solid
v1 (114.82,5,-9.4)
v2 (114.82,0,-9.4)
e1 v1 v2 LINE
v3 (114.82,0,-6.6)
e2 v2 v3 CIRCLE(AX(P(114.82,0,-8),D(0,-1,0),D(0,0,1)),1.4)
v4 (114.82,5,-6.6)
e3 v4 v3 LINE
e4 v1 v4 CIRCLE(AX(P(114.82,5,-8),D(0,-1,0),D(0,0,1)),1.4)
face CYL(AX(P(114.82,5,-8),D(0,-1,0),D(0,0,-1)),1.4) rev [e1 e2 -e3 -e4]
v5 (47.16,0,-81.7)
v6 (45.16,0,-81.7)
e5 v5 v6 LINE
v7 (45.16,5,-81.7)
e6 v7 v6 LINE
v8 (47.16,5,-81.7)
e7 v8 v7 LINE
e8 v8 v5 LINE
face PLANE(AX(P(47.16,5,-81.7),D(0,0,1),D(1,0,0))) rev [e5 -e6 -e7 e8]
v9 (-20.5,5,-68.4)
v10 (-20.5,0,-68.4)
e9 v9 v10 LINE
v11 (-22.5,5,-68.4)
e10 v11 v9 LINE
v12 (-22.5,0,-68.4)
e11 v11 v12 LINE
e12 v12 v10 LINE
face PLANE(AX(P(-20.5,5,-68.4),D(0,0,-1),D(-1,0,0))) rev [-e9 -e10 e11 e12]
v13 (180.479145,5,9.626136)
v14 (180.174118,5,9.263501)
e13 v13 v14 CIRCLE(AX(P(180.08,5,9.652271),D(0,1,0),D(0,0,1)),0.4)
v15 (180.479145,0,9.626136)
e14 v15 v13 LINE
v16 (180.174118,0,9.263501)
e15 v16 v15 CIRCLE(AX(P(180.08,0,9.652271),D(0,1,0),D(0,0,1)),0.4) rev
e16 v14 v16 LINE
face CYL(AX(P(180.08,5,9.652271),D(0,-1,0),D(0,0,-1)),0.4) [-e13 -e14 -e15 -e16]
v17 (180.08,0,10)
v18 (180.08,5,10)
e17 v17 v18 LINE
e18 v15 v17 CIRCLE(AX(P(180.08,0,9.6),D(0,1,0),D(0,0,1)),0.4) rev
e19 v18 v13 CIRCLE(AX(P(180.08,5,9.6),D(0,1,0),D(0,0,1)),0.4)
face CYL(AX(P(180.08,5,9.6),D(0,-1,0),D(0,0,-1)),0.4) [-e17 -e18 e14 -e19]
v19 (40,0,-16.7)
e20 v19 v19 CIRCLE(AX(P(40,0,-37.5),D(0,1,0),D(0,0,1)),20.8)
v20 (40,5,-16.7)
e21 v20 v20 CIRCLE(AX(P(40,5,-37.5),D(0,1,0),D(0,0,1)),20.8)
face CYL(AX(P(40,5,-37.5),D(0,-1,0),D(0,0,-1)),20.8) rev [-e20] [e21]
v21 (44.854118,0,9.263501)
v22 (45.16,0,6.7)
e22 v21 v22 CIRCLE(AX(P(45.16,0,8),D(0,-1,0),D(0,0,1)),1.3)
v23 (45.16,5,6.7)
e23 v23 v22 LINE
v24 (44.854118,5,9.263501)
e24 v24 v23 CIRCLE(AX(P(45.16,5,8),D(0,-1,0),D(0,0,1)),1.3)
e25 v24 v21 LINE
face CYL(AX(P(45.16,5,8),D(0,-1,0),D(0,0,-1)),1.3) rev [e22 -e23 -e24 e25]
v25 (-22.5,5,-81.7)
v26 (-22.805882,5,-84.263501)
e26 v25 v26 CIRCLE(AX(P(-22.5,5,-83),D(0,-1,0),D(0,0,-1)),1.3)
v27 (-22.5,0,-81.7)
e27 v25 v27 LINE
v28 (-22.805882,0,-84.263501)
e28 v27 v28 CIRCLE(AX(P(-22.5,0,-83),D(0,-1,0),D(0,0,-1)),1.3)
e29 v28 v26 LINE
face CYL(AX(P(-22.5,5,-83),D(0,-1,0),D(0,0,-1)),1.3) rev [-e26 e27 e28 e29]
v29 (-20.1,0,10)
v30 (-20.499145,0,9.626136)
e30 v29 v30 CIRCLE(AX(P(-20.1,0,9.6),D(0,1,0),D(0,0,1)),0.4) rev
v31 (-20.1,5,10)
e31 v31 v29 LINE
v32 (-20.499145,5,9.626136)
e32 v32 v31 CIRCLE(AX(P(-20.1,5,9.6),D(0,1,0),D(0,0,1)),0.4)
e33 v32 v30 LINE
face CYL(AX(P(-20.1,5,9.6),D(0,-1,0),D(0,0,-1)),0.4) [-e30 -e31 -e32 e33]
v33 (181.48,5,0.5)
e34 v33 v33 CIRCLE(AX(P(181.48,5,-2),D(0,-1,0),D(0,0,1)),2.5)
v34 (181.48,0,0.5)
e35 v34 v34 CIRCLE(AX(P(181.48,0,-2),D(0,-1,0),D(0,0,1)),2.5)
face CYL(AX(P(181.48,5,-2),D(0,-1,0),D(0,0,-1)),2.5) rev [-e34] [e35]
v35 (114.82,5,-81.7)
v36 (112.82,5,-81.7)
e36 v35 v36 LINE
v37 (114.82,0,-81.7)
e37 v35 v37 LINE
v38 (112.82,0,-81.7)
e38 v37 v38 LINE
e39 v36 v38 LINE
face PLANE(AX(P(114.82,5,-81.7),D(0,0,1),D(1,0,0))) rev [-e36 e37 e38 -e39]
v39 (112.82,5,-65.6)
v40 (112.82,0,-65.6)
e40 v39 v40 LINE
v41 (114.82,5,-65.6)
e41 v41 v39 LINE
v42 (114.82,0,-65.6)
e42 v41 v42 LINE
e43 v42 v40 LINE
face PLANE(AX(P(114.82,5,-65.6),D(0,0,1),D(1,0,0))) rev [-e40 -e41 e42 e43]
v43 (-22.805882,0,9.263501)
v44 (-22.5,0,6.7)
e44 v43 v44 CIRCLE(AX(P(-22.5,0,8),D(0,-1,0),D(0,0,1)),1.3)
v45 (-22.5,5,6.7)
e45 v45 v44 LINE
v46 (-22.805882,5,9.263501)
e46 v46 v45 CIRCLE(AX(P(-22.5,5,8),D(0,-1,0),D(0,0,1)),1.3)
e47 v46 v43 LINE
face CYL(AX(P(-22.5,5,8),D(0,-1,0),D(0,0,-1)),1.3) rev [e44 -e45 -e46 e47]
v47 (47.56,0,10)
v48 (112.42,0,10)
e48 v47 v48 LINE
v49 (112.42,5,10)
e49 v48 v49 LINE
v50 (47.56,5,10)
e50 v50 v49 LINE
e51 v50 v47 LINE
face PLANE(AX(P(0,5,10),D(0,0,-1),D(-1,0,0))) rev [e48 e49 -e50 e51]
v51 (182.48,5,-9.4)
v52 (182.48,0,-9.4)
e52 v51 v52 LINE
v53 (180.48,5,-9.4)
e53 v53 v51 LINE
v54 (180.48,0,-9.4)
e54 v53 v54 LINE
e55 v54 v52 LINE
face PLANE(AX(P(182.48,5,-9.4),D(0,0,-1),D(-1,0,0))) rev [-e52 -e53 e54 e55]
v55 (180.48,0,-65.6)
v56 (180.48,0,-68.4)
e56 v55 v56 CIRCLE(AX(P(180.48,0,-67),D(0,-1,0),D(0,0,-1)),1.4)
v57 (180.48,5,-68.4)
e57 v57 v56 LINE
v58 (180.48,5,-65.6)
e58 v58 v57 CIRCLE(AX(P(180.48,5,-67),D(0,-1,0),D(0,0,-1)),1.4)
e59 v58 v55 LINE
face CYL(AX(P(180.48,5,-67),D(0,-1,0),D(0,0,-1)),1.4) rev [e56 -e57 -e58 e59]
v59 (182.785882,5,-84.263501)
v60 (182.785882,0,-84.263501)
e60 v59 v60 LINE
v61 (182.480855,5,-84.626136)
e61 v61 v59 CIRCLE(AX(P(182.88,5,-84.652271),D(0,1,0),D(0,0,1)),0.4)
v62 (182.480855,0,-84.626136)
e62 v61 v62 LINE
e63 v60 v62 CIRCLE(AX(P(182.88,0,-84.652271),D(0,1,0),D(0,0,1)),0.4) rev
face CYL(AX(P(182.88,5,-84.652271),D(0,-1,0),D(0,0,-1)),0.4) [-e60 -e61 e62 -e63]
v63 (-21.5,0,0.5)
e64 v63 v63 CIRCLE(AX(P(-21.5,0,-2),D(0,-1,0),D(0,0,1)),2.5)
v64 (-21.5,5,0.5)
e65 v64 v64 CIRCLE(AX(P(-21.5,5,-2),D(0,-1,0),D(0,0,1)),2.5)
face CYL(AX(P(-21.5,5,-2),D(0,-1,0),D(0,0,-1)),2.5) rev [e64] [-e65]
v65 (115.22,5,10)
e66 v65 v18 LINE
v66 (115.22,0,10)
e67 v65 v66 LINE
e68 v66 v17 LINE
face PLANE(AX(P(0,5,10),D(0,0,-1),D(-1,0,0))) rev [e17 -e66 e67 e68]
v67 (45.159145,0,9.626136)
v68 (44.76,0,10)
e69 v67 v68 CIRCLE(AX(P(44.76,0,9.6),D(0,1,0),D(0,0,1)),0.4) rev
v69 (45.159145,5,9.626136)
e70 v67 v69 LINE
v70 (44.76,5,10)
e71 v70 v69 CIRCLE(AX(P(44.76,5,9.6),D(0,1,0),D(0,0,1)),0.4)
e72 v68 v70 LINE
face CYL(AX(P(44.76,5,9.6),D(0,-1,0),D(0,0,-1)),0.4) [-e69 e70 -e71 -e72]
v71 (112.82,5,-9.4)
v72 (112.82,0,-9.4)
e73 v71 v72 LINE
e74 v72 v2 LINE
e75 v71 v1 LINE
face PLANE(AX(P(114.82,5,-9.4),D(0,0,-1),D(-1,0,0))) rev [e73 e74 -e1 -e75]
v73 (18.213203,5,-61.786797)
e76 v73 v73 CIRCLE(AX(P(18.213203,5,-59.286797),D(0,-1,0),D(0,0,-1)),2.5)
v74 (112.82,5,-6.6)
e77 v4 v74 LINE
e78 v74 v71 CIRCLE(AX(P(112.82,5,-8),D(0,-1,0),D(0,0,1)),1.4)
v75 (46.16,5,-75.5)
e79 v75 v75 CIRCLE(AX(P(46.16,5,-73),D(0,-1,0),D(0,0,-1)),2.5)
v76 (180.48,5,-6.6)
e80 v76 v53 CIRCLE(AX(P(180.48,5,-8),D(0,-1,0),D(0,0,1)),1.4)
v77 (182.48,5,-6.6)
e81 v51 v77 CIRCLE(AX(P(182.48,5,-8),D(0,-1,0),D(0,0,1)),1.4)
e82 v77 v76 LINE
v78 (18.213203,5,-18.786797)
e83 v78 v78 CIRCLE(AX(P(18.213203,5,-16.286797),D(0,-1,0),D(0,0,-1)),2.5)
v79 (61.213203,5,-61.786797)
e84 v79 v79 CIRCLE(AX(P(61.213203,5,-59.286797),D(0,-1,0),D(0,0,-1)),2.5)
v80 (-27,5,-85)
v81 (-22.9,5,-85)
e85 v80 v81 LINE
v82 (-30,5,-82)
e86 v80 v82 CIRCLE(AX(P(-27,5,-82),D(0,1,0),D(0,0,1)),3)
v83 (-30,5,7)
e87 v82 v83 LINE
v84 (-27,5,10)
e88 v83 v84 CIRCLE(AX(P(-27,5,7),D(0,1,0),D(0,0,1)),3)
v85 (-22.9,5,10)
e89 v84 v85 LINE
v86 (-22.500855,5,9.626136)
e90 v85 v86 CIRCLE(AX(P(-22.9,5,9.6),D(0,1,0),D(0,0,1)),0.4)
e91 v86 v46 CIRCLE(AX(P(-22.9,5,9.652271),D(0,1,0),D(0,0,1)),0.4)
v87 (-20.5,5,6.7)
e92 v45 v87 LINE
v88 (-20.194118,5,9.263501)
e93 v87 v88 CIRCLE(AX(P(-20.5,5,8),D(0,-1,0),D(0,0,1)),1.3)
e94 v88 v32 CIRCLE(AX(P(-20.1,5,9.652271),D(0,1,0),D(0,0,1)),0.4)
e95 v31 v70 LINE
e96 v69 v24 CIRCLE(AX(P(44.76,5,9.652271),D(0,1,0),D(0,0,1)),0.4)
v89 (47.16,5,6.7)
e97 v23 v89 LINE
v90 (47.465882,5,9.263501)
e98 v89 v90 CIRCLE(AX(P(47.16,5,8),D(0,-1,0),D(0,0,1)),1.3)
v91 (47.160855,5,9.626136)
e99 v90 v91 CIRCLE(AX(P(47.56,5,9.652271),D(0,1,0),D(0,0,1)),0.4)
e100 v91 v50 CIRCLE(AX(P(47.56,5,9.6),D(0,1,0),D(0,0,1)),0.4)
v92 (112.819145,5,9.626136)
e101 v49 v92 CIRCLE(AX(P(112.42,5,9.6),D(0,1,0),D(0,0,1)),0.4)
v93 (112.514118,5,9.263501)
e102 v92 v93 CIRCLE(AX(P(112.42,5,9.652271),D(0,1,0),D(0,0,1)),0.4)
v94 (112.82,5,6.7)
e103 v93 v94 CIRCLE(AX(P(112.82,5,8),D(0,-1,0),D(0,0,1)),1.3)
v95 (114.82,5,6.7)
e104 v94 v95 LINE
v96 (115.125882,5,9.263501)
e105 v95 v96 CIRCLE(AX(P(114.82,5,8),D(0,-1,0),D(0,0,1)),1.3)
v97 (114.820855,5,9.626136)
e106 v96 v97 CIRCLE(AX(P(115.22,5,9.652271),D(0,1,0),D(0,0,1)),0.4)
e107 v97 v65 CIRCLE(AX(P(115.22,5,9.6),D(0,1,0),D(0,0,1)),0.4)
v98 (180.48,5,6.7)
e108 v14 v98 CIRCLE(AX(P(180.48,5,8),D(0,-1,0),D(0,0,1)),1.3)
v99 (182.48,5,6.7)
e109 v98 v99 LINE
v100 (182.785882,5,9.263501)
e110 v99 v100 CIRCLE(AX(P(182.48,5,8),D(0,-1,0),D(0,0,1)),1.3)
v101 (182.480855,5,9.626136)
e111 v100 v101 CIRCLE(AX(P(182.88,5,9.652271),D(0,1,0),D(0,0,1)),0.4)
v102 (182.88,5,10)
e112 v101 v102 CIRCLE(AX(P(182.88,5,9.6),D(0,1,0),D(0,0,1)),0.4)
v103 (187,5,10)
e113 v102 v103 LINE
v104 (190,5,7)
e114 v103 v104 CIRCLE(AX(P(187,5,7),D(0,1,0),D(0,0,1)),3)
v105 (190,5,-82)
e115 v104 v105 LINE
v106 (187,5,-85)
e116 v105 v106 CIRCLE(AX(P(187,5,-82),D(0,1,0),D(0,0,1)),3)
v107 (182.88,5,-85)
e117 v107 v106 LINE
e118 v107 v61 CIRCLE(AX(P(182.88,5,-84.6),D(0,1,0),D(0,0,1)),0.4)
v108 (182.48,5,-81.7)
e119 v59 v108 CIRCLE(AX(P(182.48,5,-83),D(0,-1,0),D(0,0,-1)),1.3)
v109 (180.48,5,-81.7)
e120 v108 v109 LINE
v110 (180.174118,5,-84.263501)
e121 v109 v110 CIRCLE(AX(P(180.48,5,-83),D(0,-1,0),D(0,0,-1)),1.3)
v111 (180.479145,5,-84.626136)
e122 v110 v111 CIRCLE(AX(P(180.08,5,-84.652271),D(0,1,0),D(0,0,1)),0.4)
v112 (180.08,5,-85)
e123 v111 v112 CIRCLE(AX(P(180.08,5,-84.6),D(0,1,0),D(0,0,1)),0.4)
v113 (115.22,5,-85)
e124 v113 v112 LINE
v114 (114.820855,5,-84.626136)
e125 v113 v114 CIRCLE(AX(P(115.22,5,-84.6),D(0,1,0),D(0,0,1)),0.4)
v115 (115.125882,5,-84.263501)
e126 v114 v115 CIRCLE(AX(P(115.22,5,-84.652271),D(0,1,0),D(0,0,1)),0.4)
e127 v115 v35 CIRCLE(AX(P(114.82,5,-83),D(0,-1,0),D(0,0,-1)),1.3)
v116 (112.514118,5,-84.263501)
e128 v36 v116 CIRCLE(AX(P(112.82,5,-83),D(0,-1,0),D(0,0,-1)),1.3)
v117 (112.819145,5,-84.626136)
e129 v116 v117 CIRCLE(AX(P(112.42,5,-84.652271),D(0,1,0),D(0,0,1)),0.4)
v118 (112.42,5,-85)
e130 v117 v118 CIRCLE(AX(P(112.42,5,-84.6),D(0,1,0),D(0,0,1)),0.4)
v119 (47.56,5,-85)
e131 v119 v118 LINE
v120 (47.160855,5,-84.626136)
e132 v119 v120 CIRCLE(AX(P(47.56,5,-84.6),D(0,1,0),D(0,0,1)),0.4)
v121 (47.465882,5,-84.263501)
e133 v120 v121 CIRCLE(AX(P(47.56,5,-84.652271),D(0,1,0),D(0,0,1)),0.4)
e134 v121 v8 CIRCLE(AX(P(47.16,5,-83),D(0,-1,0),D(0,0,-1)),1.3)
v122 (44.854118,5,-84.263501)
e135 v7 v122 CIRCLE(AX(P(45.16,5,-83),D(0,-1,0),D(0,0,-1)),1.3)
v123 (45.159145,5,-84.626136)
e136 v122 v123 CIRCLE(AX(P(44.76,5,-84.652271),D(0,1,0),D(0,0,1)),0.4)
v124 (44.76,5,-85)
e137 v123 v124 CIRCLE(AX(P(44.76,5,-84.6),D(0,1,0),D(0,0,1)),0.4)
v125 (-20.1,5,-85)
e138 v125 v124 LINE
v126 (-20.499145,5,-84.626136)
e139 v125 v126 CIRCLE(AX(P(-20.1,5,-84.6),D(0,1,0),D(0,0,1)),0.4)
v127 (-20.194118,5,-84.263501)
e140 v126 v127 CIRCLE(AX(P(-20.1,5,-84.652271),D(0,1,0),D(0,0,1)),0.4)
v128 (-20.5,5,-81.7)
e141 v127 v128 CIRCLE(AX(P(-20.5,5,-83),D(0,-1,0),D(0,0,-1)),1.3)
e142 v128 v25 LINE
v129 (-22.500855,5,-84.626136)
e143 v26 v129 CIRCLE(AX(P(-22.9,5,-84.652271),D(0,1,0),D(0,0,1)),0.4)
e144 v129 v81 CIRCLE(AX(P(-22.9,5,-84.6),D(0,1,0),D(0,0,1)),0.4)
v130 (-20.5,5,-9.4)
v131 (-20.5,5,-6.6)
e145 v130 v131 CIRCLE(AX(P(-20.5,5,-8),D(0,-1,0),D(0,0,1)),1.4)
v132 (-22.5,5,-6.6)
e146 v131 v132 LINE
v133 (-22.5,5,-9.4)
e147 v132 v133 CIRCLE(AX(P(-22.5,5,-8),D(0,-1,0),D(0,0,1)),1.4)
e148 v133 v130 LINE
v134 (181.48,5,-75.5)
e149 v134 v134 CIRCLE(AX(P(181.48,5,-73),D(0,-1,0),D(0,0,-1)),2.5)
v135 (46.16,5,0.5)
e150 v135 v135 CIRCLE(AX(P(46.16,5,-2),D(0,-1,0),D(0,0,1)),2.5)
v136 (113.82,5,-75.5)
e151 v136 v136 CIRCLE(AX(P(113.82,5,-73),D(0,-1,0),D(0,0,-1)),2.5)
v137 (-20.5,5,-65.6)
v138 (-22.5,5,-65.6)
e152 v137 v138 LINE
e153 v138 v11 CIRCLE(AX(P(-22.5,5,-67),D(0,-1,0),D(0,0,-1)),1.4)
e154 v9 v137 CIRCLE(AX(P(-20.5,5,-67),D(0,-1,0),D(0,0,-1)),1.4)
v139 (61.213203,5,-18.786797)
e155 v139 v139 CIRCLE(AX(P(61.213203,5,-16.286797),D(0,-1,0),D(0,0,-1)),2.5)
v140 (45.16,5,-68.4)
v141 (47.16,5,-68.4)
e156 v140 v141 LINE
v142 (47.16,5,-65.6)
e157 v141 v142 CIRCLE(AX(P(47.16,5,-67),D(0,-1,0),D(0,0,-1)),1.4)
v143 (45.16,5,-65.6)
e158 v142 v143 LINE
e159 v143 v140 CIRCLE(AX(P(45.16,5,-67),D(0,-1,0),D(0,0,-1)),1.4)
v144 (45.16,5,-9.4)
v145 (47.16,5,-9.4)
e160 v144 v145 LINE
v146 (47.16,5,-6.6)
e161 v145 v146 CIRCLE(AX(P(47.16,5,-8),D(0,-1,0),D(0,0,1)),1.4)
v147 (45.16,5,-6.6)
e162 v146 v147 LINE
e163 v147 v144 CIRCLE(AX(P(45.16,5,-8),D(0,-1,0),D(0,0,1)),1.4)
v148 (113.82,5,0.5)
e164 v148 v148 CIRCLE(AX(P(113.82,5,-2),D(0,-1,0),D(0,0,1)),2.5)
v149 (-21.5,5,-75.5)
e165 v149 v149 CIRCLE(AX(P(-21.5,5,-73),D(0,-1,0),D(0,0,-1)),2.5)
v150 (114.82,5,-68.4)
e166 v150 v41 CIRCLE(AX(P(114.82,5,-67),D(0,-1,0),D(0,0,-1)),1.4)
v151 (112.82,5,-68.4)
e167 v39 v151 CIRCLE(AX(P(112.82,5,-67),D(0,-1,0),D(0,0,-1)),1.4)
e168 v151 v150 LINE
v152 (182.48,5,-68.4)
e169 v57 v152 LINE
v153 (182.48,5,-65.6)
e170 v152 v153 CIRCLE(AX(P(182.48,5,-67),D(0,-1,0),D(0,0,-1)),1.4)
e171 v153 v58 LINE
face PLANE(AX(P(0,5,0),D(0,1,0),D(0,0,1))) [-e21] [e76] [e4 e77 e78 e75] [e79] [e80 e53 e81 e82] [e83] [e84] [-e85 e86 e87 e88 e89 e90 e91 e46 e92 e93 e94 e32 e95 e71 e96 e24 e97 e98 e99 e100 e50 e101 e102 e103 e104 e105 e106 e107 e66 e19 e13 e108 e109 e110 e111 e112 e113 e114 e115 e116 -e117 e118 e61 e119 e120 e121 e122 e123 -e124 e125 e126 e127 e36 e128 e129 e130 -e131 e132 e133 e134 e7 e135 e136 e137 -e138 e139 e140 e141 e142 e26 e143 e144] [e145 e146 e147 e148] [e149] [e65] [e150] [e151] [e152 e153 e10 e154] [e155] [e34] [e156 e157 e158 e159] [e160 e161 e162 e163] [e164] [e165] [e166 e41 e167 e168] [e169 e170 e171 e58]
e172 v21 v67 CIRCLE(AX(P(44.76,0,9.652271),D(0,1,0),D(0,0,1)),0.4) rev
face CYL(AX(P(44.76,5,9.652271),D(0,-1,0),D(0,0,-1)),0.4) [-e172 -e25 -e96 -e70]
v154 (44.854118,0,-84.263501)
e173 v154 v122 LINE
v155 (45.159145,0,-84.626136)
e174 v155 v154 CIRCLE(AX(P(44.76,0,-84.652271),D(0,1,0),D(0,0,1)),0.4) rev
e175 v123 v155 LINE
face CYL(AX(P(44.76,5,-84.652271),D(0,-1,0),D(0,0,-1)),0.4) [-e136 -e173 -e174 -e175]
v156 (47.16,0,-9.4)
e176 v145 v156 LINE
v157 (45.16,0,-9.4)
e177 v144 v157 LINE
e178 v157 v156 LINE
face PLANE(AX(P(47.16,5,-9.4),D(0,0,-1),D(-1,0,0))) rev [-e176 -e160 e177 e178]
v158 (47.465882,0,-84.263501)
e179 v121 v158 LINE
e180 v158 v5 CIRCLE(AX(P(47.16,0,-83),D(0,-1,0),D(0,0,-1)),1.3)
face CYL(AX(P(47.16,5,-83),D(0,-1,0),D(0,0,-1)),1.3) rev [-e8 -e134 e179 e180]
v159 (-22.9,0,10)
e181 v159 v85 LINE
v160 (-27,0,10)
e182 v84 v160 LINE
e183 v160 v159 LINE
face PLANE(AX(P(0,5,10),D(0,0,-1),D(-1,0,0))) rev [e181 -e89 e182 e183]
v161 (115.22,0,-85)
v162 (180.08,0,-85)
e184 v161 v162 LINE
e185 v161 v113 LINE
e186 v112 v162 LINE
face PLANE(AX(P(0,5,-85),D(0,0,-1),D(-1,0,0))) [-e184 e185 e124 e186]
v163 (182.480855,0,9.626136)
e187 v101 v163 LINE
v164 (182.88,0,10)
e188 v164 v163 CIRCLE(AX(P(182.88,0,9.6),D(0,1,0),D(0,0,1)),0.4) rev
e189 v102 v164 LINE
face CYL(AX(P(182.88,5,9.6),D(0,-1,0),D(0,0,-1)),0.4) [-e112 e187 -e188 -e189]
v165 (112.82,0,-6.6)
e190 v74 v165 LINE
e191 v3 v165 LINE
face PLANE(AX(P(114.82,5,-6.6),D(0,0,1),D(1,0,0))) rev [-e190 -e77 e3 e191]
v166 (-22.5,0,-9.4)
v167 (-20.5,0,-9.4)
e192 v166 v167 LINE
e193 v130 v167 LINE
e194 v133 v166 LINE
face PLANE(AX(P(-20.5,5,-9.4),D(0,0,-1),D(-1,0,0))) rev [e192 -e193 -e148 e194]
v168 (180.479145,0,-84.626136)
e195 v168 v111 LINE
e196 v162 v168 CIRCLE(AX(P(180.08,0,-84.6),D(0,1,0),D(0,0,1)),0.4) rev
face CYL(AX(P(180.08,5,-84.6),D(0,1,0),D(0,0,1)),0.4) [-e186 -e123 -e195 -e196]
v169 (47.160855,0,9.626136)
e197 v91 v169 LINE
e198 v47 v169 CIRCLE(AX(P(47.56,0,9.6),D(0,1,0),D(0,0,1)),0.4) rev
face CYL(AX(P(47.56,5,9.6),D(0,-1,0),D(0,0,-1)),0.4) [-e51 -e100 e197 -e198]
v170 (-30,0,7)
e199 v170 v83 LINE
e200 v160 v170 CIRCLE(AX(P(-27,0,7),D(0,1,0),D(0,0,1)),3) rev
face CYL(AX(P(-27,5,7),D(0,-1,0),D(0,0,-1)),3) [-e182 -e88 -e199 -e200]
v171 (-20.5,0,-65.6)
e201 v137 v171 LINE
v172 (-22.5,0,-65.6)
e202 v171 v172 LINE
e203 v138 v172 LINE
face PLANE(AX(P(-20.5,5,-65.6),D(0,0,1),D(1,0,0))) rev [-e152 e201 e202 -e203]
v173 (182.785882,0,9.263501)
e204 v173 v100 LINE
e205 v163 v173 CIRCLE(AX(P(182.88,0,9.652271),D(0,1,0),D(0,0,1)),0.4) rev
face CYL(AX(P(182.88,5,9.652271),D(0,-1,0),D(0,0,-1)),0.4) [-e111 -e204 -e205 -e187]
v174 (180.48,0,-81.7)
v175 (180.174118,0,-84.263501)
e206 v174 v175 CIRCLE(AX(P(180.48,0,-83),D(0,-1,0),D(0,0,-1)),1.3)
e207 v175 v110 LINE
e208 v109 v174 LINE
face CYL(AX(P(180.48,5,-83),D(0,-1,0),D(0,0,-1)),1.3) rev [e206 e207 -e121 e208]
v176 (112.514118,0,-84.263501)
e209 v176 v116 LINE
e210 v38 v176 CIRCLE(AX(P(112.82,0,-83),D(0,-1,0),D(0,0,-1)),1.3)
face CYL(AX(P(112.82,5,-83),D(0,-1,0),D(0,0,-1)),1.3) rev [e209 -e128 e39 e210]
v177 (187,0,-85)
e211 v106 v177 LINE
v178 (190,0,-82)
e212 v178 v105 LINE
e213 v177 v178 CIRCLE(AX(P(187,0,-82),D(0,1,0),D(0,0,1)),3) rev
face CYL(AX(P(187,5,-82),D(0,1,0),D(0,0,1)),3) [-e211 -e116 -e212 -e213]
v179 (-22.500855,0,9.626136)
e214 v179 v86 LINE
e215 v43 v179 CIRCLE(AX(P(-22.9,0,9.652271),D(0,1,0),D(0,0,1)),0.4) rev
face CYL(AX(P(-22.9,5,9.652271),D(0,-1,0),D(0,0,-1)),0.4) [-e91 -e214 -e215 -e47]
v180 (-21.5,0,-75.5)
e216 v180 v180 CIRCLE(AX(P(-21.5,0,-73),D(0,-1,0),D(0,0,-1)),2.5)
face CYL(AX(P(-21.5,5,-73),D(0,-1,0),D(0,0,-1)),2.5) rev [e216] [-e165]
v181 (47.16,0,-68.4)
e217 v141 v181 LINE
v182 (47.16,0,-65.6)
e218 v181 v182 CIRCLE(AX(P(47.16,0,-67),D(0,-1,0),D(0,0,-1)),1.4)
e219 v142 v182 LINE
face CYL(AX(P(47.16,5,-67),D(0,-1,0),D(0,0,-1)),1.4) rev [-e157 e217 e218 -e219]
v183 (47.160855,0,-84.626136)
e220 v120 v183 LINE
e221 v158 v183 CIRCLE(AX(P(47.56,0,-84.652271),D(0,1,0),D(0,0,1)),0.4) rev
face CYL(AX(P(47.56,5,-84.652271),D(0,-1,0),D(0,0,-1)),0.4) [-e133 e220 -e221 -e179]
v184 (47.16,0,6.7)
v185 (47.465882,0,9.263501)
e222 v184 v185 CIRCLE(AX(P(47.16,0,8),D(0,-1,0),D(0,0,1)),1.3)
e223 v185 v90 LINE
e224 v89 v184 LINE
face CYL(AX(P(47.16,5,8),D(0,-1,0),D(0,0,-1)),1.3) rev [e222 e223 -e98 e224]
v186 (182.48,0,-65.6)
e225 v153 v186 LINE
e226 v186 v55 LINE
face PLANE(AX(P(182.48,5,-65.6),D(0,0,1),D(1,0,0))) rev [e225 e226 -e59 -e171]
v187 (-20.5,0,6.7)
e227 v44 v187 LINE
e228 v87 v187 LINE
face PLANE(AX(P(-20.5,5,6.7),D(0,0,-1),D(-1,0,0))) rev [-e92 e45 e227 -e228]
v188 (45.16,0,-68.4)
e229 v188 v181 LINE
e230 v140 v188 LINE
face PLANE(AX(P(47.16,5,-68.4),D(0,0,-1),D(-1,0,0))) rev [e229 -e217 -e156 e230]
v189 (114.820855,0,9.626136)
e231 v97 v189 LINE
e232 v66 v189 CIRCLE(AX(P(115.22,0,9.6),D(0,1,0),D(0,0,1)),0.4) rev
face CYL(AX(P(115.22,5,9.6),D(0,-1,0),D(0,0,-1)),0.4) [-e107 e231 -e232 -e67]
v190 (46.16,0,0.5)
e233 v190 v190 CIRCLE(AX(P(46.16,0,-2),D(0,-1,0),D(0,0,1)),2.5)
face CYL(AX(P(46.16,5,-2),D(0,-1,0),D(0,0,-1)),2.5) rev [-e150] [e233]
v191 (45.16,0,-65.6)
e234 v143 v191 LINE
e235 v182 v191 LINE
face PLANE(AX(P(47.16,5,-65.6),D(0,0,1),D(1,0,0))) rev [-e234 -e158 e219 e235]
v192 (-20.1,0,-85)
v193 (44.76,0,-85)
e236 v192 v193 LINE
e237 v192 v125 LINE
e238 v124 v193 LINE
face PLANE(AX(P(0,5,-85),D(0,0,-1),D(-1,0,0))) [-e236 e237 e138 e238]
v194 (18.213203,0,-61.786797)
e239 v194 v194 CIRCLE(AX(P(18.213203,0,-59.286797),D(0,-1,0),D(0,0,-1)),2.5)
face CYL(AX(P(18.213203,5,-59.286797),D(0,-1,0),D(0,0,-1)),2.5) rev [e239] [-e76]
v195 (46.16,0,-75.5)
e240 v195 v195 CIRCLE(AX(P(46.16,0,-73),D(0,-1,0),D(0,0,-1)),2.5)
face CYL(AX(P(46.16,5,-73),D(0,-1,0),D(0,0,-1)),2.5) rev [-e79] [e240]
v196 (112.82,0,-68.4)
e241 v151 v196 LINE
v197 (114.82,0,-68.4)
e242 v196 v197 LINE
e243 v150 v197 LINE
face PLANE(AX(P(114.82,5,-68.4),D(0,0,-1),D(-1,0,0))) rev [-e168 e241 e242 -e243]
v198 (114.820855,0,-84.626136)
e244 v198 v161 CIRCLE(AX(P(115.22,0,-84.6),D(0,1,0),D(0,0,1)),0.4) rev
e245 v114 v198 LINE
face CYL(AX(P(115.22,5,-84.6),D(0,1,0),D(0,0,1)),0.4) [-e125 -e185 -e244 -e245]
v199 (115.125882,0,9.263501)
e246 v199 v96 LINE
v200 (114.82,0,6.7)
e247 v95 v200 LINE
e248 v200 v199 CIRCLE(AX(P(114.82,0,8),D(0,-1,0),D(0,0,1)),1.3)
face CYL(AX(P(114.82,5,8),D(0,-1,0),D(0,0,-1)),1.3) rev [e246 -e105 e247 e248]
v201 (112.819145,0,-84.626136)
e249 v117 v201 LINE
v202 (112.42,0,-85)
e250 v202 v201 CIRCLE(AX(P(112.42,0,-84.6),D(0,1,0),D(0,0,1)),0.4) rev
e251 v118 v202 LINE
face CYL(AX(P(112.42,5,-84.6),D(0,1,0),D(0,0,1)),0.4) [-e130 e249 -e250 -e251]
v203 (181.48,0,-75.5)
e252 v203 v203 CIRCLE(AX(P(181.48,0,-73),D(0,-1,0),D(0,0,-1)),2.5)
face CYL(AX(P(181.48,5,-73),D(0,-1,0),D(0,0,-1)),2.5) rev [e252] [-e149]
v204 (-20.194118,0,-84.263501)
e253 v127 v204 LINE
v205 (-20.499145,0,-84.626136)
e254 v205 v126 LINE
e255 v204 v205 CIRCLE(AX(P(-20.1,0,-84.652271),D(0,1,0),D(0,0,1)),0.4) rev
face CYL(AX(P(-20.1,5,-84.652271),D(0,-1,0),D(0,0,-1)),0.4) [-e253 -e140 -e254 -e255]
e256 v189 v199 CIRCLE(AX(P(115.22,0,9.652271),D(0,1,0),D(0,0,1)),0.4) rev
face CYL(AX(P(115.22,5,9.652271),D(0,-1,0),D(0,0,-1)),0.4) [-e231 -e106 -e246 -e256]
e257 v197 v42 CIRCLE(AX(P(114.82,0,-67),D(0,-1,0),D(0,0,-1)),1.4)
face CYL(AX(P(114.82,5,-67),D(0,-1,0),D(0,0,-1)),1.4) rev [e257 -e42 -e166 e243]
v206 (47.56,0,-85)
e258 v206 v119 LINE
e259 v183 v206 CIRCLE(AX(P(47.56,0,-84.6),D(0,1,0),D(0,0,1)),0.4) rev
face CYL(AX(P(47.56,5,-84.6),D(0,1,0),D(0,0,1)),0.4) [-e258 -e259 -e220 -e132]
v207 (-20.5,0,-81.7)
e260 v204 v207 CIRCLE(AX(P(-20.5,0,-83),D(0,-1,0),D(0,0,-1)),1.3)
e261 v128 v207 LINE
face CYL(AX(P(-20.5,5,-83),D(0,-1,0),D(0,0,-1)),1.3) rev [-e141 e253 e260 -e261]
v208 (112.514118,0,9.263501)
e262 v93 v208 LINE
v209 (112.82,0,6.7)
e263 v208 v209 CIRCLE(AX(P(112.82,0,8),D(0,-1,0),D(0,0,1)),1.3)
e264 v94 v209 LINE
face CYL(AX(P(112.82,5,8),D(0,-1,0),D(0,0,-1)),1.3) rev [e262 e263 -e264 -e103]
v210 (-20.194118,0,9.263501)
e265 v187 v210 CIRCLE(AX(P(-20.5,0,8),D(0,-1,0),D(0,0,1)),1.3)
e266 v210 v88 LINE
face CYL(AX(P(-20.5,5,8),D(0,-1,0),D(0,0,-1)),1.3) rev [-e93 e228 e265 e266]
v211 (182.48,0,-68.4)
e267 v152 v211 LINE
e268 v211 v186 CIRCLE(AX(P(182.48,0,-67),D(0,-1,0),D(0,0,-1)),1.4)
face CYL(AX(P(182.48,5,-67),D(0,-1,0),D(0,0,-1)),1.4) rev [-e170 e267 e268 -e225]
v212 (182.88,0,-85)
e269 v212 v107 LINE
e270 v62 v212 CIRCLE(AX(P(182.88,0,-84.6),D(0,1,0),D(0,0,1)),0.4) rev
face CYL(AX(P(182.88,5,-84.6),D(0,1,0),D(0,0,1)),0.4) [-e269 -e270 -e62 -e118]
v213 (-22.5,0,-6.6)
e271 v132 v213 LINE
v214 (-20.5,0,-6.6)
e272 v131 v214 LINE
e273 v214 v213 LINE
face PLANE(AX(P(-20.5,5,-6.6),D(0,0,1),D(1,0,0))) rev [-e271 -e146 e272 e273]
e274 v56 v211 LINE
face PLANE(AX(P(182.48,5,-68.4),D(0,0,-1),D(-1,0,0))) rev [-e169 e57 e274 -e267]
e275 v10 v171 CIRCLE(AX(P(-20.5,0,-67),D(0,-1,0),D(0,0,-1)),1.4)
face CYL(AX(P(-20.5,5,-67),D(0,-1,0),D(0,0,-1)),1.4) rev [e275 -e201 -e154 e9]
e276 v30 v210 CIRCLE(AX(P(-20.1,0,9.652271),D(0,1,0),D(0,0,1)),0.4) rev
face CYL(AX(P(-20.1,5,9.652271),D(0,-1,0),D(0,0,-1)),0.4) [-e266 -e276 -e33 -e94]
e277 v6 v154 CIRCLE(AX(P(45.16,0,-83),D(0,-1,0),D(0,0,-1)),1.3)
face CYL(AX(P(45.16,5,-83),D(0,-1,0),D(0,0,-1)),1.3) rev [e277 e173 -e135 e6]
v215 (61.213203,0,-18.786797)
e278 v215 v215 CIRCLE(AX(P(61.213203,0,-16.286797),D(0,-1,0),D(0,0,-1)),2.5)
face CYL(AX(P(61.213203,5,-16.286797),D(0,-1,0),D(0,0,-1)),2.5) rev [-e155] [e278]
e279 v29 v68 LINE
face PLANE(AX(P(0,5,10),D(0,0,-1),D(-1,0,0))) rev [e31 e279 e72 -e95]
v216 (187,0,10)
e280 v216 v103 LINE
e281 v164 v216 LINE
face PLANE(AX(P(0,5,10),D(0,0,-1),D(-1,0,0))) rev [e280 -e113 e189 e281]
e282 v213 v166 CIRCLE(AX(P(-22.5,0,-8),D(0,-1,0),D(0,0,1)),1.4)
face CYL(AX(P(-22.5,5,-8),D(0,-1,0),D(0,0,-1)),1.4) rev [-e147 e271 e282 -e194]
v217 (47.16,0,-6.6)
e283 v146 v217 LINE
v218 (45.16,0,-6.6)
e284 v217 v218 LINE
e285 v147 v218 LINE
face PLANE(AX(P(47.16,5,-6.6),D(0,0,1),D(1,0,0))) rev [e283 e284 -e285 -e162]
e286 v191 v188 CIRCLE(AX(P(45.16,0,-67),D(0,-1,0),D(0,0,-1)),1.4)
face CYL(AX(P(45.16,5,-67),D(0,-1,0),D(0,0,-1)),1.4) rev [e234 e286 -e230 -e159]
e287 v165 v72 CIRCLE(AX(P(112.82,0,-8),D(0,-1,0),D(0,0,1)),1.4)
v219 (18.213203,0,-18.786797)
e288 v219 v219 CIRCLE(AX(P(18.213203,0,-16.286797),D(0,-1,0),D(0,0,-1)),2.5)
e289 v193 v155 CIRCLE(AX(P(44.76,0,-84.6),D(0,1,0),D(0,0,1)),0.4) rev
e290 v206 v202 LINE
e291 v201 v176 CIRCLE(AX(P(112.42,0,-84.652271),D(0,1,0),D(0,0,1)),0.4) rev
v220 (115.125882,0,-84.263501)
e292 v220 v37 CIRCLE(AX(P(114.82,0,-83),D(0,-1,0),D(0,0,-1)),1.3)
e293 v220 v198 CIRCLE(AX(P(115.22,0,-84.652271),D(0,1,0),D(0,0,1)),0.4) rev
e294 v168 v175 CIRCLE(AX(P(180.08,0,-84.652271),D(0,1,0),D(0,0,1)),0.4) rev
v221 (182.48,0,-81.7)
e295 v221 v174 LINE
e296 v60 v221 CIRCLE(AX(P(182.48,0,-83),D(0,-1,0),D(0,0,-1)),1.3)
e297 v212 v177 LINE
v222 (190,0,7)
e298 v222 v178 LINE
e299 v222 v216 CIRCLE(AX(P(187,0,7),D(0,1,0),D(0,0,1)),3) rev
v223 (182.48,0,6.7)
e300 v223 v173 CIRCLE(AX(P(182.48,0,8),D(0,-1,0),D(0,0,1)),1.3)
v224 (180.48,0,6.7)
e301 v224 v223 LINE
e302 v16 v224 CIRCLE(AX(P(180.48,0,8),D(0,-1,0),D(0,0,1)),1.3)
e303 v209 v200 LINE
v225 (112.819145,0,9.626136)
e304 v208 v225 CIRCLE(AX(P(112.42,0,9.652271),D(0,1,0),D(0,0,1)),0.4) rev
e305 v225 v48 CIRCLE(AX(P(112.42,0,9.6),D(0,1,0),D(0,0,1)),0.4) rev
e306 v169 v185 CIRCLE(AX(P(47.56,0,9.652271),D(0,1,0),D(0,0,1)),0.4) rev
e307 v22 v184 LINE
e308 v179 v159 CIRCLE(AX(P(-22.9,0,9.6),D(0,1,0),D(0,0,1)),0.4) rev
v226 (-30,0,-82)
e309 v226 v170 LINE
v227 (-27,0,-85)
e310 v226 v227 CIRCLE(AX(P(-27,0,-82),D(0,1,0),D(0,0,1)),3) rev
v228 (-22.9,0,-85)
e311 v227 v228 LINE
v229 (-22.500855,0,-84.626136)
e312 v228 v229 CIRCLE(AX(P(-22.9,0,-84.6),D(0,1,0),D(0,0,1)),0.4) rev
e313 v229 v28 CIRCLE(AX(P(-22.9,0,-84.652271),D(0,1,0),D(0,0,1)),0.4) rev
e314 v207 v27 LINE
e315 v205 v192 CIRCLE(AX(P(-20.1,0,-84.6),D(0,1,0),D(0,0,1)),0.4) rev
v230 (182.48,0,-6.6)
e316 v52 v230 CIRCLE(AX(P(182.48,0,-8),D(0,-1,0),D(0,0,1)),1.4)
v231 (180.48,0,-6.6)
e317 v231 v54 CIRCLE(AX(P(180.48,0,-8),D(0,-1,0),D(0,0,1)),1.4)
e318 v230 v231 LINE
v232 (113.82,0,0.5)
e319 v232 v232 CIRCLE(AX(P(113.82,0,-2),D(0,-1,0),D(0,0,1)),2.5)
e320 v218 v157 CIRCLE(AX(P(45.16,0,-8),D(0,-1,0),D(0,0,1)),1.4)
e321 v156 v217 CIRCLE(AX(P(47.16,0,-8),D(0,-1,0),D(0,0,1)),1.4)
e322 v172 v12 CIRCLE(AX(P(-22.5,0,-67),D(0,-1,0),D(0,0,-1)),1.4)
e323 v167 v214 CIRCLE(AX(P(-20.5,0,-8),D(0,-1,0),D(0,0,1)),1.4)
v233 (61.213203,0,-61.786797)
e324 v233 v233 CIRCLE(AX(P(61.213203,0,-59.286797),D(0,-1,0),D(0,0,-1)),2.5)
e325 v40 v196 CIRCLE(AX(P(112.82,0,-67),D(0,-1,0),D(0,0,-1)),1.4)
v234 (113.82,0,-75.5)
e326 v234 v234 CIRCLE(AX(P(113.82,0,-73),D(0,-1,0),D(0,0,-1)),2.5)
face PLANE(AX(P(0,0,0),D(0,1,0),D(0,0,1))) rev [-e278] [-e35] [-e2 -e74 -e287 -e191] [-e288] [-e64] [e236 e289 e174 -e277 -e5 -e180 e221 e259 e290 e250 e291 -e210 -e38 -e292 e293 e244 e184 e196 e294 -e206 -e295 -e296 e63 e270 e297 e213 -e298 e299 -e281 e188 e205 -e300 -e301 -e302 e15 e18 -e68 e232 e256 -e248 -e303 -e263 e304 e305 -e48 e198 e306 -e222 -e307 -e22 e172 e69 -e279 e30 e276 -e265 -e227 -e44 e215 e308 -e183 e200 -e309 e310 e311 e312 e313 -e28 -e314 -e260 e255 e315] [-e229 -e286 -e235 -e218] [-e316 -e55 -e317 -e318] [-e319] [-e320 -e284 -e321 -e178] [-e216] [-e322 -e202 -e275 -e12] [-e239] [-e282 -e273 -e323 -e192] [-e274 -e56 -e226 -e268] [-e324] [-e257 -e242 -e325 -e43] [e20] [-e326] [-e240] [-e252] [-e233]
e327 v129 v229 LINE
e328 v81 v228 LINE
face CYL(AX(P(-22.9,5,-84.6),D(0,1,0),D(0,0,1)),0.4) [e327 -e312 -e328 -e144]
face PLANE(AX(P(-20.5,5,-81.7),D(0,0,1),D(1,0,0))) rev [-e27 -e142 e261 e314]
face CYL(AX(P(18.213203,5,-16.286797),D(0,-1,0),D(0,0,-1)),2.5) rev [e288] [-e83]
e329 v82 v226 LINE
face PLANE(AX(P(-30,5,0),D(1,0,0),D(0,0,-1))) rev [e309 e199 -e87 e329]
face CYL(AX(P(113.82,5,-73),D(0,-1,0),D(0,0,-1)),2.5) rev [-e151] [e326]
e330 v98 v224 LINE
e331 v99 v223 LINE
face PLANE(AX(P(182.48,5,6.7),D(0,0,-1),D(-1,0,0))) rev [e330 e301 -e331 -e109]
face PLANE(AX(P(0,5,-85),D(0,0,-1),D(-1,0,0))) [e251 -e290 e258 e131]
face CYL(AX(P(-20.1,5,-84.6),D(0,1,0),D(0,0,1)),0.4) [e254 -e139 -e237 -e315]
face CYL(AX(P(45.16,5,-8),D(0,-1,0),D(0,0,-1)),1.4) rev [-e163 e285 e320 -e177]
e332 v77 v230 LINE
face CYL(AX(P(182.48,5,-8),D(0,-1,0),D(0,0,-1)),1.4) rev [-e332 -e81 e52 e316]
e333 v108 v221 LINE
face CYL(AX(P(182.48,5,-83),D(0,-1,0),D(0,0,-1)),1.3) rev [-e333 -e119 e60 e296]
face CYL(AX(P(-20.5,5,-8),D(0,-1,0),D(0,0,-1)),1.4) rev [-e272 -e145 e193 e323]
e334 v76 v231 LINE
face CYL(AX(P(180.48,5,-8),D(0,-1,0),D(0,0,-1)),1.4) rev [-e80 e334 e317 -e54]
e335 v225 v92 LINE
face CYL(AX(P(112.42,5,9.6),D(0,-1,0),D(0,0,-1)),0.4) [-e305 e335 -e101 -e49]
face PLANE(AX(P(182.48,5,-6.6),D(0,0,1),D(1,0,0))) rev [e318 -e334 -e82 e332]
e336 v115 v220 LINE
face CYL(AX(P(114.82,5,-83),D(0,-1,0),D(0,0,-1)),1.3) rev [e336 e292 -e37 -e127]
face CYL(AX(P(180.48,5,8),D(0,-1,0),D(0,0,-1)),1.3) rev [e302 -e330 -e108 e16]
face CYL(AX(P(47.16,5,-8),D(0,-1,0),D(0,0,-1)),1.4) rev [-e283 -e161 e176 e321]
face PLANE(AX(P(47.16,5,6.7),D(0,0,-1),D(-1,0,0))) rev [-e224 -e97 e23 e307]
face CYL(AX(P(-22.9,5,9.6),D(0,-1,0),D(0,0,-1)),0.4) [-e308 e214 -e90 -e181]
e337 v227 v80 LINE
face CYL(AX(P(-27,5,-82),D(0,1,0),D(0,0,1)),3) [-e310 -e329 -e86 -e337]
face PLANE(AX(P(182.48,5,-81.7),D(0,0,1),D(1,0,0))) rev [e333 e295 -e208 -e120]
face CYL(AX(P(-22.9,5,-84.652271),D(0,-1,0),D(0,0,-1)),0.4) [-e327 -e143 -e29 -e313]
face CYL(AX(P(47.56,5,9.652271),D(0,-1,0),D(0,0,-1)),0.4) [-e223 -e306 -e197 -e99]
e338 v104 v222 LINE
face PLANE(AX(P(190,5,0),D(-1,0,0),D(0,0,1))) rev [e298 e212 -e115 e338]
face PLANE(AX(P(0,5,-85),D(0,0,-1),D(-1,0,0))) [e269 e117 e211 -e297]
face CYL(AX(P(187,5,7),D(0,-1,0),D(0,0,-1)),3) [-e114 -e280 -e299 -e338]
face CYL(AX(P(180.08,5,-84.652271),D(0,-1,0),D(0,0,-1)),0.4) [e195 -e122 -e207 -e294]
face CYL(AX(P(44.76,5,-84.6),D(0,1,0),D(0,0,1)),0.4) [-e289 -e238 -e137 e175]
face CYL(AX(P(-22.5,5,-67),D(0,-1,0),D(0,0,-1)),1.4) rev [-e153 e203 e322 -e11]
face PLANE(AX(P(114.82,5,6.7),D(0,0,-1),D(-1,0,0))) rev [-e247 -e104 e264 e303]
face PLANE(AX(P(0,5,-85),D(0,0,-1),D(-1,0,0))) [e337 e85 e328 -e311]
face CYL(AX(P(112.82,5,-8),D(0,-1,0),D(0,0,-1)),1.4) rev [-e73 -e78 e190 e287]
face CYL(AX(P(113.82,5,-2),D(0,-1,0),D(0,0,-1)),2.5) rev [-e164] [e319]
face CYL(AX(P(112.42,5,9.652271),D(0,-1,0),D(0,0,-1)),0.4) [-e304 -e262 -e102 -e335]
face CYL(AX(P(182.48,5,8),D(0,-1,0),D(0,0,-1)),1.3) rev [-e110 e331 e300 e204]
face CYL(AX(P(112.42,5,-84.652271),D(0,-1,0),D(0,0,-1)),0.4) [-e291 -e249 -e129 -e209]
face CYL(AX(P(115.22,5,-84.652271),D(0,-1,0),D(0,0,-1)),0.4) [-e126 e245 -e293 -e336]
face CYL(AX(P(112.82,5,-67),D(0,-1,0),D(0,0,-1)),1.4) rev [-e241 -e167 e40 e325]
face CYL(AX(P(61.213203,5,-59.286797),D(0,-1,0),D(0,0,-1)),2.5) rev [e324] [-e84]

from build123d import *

# Parameters (mm, degrees)
SKETCH1_R           = 20.8
BOSS_EXTRUDE1_DEPTH = 5
SKETCH2_R           = 2.5
CUT_EXTRUDE1_DEPTH  = 381.250527306
SKETCH5_R           = 2.5
CUT_EXTRUDE5_DEPTH  = 209.206628137
FILLET1_R           = 0.4
FILLET2_R           = 3


with BuildPart() as part:
    # Sketch1 → Boss-Extrude1 (new body)
    with BuildSketch(Plane(origin=(0, 0, 0), x_dir=(1, 0, 0), z_dir=(0, 1, 0))):
        Polygon((0, -10), (190, -10), (190, 85), (0, 85), (-30, 85), (-30, -10), align=None)
        with Locations(Location((40, 37.5, 0), (0, 0, 270))):
            Circle(SKETCH1_R, mode=Mode.SUBTRACT)
    extrude(amount=BOSS_EXTRUDE1_DEPTH)

    # Sketch2 → Cut-Extrude1 (cut, through all)
    with BuildSketch(Plane(origin=(-147.27442804, 0, -165.531831037), x_dir=(1, 0, 0), z_dir=(0, -1, 0))):
        with Locations(Location((208.487631475, 149.245034473, 0), (0, 0, 270))):
            Circle(SKETCH2_R)
        with Locations(Location((208.487631475, 106.245034473, 0), (0, 0, 270))):
            Circle(SKETCH2_R)
        with Locations(Location((165.487631475, 149.245034473, 0), (0, 0, 270))):
            Circle(SKETCH2_R)
        with Locations(Location((165.487631475, 106.245034473, 0), (0, 0, 270))):
            Circle(SKETCH2_R)
    extrude(amount=-CUT_EXTRUDE1_DEPTH, mode=Mode.SUBTRACT)

    # Sketch5 → Cut-Extrude5 (cut, through all)
    with BuildSketch(Plane(origin=(0, 0, 0), x_dir=(-1, 0, 0), z_dir=(0, -1, 0))):
        with Locations(Location((21.499999973, 73, 0), (0, 0, 90))):
            Circle(SKETCH5_R)
        with Locations(Location((-46.160000027, 73, 0), (0, 0, 90))):
            Circle(SKETCH5_R)
        with Locations(Location((-113.820000027, 73, 0), (0, 0, 90))):
            Circle(SKETCH5_R)
        with Locations(Location((-181.480000027, 73, 0), (0, 0, 90))):
            Circle(SKETCH5_R)
        with Locations(Location((-181.480000027, 2, 0), (0, 0, 270))):
            Circle(SKETCH5_R)
        with Locations(Location((-113.820000027, 2, 0), (0, 0, 270))):
            Circle(SKETCH5_R)
        with Locations(Location((-46.160000027, 2, 0), (0, 0, 270))):
            Circle(SKETCH5_R)
        with Locations(Location((21.499999973, 2, 0), (0, 0, 270))):
            Circle(SKETCH5_R)
        with BuildLine():
            Line((20.499999973, 68.4), (22.499999973, 68.4))
            ThreePointArc((22.499999973, 68.4), (23.899999973, 67), (22.499999973, 65.6))
            Line((22.499999973, 65.6), (20.499999973, 65.6))
            ThreePointArc((20.499999973, 65.6), (19.099999973, 67), (20.499999973, 68.4))
        make_face()
        with BuildLine():
            Line((20.499999973, 81.7), (22.499999973, 81.7))
            ThreePointArc((22.499999973, 81.7), (23.799999973, 83), (22.499999973, 84.3))
            Line((22.499999973, 84.3), (22.499999973, 85))
            Line((22.499999973, 85), (20.499999973, 85))
            Line((20.499999973, 85), (20.499999973, 84.3))
            ThreePointArc((20.499999973, 84.3), (19.199999973, 83), (20.499999973, 81.7))
        make_face()
        with BuildLine():
            Line((-47.160000027, 68.4), (-45.160000027, 68.4))
            ThreePointArc((-45.160000027, 68.4), (-43.760000027, 67), (-45.160000027, 65.6))
            Line((-45.160000027, 65.6), (-47.160000027, 65.6))
            ThreePointArc((-47.160000027, 65.6), (-48.560000027, 67), (-47.160000027, 68.4))
        make_face()
        with BuildLine():
            Line((-47.160000027, 81.7), (-45.160000027, 81.7))
            ThreePointArc((-45.160000027, 81.7), (-43.860000027, 83), (-45.160000027, 84.3))
            Line((-45.160000027, 84.3), (-45.160000027, 85))
            Line((-45.160000027, 85), (-47.160000027, 85))
            Line((-47.160000027, 85), (-47.160000027, 84.3))
            ThreePointArc((-47.160000027, 84.3), (-48.460000027, 83), (-47.160000027, 81.7))
        make_face()
        with BuildLine():
            Line((-114.820000027, 68.4), (-112.820000027, 68.4))
            ThreePointArc((-112.820000027, 68.4), (-111.420000027, 67), (-112.820000027, 65.6))
            Line((-112.820000027, 65.6), (-114.820000027, 65.6))
            ThreePointArc((-114.820000027, 65.6), (-116.220000027, 67), (-114.820000027, 68.4))
        make_face()
        with BuildLine():
            Line((-114.820000027, 81.7), (-112.820000027, 81.7))
            ThreePointArc((-112.820000027, 81.7), (-111.520000027, 83), (-112.820000027, 84.3))
            Line((-112.820000027, 84.3), (-112.820000027, 85))
            Line((-112.820000027, 85), (-114.820000027, 85))
            Line((-114.820000027, 85), (-114.820000027, 84.3))
            ThreePointArc((-114.820000027, 84.3), (-116.120000027, 83), (-114.820000027, 81.7))
        make_face()
        with BuildLine():
            Line((-182.480000027, 68.4), (-180.480000027, 68.4))
            ThreePointArc((-180.480000027, 68.4), (-179.080000027, 67), (-180.480000027, 65.6))
            Line((-180.480000027, 65.6), (-182.480000027, 65.6))
            ThreePointArc((-182.480000027, 65.6), (-183.880000027, 67), (-182.480000027, 68.4))
        make_face()
        with BuildLine():
            Line((-182.480000027, 81.7), (-180.480000027, 81.7))
            ThreePointArc((-180.480000027, 81.7), (-179.180000027, 83), (-180.480000027, 84.3))
            Line((-180.480000027, 84.3), (-180.480000027, 85))
            Line((-180.480000027, 85), (-182.480000027, 85))
            Line((-182.480000027, 85), (-182.480000027, 84.3))
            ThreePointArc((-182.480000027, 84.3), (-183.780000027, 83), (-182.480000027, 81.7))
        make_face()
        with BuildLine():
            Line((-180.480000027, -10), (-182.480000027, -10))
            Line((-182.480000027, -10), (-182.480000027, -9.3))
            ThreePointArc((-182.480000027, -9.3), (-183.780000027, -8), (-182.480000027, -6.7))
            Line((-182.480000027, -6.7), (-180.480000027, -6.7))
            ThreePointArc((-180.480000027, -6.7), (-179.180000027, -8), (-180.480000027, -9.3))
            Line((-180.480000027, -9.3), (-180.480000027, -10))
        make_face()
        with BuildLine():
            Line((-112.820000027, -10), (-114.820000027, -10))
            Line((-114.820000027, -10), (-114.820000027, -9.3))
            ThreePointArc((-114.820000027, -9.3), (-116.120000027, -8), (-114.820000027, -6.7))
            Line((-114.820000027, -6.7), (-112.820000027, -6.7))
            ThreePointArc((-112.820000027, -6.7), (-111.520000027, -8), (-112.820000027, -9.3))
            Line((-112.820000027, -9.3), (-112.820000027, -10))
        make_face()
        with BuildLine():
            Line((-45.160000027, -10), (-47.160000027, -10))
            Line((-47.160000027, -10), (-47.160000027, -9.3))
            ThreePointArc((-47.160000027, -9.3), (-48.460000027, -8), (-47.160000027, -6.7))
            Line((-47.160000027, -6.7), (-45.160000027, -6.7))
            ThreePointArc((-45.160000027, -6.7), (-43.860000027, -8), (-45.160000027, -9.3))
            Line((-45.160000027, -9.3), (-45.160000027, -10))
        make_face()
        with BuildLine():
            Line((22.499999973, -10), (20.499999973, -10))
            Line((20.499999973, -10), (20.499999973, -9.3))
            ThreePointArc((20.499999973, -9.3), (19.199999973, -8), (20.499999973, -6.7))
            Line((20.499999973, -6.7), (22.499999973, -6.7))
            ThreePointArc((22.499999973, -6.7), (23.799999973, -8), (22.499999973, -9.3))
            Line((22.499999973, -9.3), (22.499999973, -10))
        make_face()
        with BuildLine():
            Line((-182.480000027, 6.6), (-180.480000027, 6.6))
            ThreePointArc((-180.480000027, 6.6), (-179.080000027, 8), (-180.480000027, 9.4))
            Line((-180.480000027, 9.4), (-182.480000027, 9.4))
            ThreePointArc((-182.480000027, 9.4), (-183.880000027, 8), (-182.480000027, 6.6))
        make_face()
        with BuildLine():
            Line((-114.820000027, 6.6), (-112.820000027, 6.6))
            ThreePointArc((-112.820000027, 6.6), (-111.420000027, 8), (-112.820000027, 9.4))
            Line((-112.820000027, 9.4), (-114.820000027, 9.4))
            ThreePointArc((-114.820000027, 9.4), (-116.220000027, 8), (-114.820000027, 6.6))
        make_face()
        with BuildLine():
            Line((-47.160000027, 6.6), (-45.160000027, 6.6))
            ThreePointArc((-45.160000027, 6.6), (-43.760000027, 8), (-45.160000027, 9.4))
            Line((-45.160000027, 9.4), (-47.160000027, 9.4))
            ThreePointArc((-47.160000027, 9.4), (-48.560000027, 8), (-47.160000027, 6.6))
        make_face()
        with BuildLine():
            Line((20.499999973, 6.6), (22.499999973, 6.6))
            ThreePointArc((22.499999973, 6.6), (23.899999973, 8), (22.499999973, 9.4))
            Line((22.499999973, 9.4), (20.499999973, 9.4))
            ThreePointArc((20.499999973, 9.4), (19.099999973, 8), (20.499999973, 6.6))
        make_face()
    extrude(amount=-CUT_EXTRUDE5_DEPTH, mode=Mode.SUBTRACT)

    # Fillet1
    # the kernel refuses this fillet: 0.4 mm, written as the material it takes off along each edge
    with BuildSketch(Plane(origin=(180.480000027, -0.88067791, 9.3), x_dir=(-0.9929562463235445, 0, -0.11848161413087033), z_dir=(0, 1, 0)), Plane(origin=(182.480000027, -0.88067791, -84.3), x_dir=(0.9929562463240562, 0, 0.11848161412658191), z_dir=(0, 1, 0)), Plane(origin=(45.160000027, -0.88067791, 9.3), x_dir=(-0.9929562463237254, 0, -0.11848161412935371), z_dir=(0, 1, 0)), Plane(origin=(112.820000027, -0.88067791, 9.3), x_dir=(-0.9929562463236348, 0, -0.11848161413011311), z_dir=(0, 1, 0)), Plane(origin=(-20.499999973, -0.88067791, -84.3), x_dir=(0.9929562463238144, 0, 0.11848161412860814), z_dir=(0, 1, 0)), Plane(origin=(47.160000027, -0.88067791, -84.3), x_dir=(0.9929562463238953, 0, 0.11848161412793001), z_dir=(0, 1, 0)), Plane(origin=(114.820000027, -0.88067791, -84.3), x_dir=(0.9929562463239765, 0, 0.11848161412724918), z_dir=(0, 1, 0)), Plane(origin=(-22.499999973, -0.88067791, 9.3), x_dir=(-0.9929562463238167, 0, -0.11848161412858836), z_dir=(0, 1, 0))) as fillet1_piece_1:
        with BuildLine():
            CenterArc((0.355444842, 0.397182499), FILLET1_R, 186.804480316, 76.391039369)
            Line((-0.041737656, 0.349789853), (0, 0))
            ThreePointArc((0, 0), (0.154026098, 0.00915688), (0.308052197, 0))
        make_face()
    extrude(amount=6.761355821, mode=Mode.SUBTRACT)
    with BuildSketch(Plane(origin=(180.480000027, -1, 10), x_dir=(0, 0, -1), z_dir=(0, 1, 0)), Plane(origin=(182.480000027, -1, 10), x_dir=(1, 0, 0), z_dir=(0, 1, 0)), Plane(origin=(180.480000027, -1, -85), x_dir=(-1, 0, 0), z_dir=(0, 1, 0)), Plane(origin=(45.160000027, -1, 10), x_dir=(0, 0, -1), z_dir=(0, 1, 0)), Plane(origin=(47.160000027, -1, 10), x_dir=(1, 0, 0), z_dir=(0, 1, 0)), Plane(origin=(112.820000027, -1, 10), x_dir=(0, 0, -1), z_dir=(0, 1, 0)), Plane(origin=(114.820000027, -1, 10), x_dir=(1, 0, 0), z_dir=(0, 1, 0)), Plane(origin=(-20.499999973, -1, -85), x_dir=(0, 0, 1), z_dir=(0, 1, 0)), Plane(origin=(-22.499999973, -1, -85), x_dir=(-1, 0, 0), z_dir=(0, 1, 0)), Plane(origin=(47.160000027, -1, -85), x_dir=(0, 0, 1), z_dir=(0, 1, 0)), Plane(origin=(45.160000027, -1, -85), x_dir=(-1, 0, 0), z_dir=(0, 1, 0)), Plane(origin=(114.820000027, -1, -85), x_dir=(0, 0, 1), z_dir=(0, 1, 0)), Plane(origin=(112.820000027, -1, -85), x_dir=(-1, 0, 0), z_dir=(0, 1, 0)), Plane(origin=(-22.499999973, -1, 10), x_dir=(0, 0, -1), z_dir=(0, 1, 0)), Plane(origin=(-20.499999973, -1, 10), x_dir=(1, 0, 0), z_dir=(0, 1, 0))) as fillet1_piece_2:
        with BuildLine():
            CenterArc((FILLET1_R, FILLET1_R), FILLET1_R, 180, 90)
            Line((0, FILLET1_R), (0, 0))
            Line((0, 0), (FILLET1_R, 0))
        make_face()
    extrude(amount=7, mode=Mode.SUBTRACT)
    with BuildSketch(Plane(origin=(182.480000027, -0.88067791, 9.3), x_dir=(0, 0, 1), z_dir=(0, 1, 0)), Plane(origin=(180.480000027, -0.88067791, -84.3), x_dir=(0, 0, -1), z_dir=(0, 1, 0)), Plane(origin=(47.160000027, -0.88067791, 9.3), x_dir=(0, 0, 1), z_dir=(0, 1, 0)), Plane(origin=(114.820000027, -0.88067791, 9.3), x_dir=(0, 0, 1), z_dir=(0, 1, 0)), Plane(origin=(-22.499999973, -0.88067791, -84.3), x_dir=(0, 0, -1), z_dir=(0, 1, 0)), Plane(origin=(45.160000027, -0.88067791, -84.3), x_dir=(0, 0, -1), z_dir=(0, 1, 0)), Plane(origin=(112.820000027, -0.88067791, -84.3), x_dir=(0, 0, -1), z_dir=(0, 1, 0)), Plane(origin=(-20.499999973, -0.88067791, 9.3), x_dir=(0, 0, 1), z_dir=(0, 1, 0))) as fillet1_piece_3:
        with BuildLine():
            CenterArc((0.352271164, 0.4), FILLET1_R, 193.608960631, 76.391039369)
            ThreePointArc((-0.036498522, 0.305882353), (-0.00915688, 0.154026098), (0, 0))
            Line((0, 0), (0.352271164, 0))
        make_face()
    extrude(amount=6.761355821, mode=Mode.SUBTRACT)
    with BuildSketch(Plane(origin=(182.480000027, -1, -85), x_dir=(1, 0, 0), z_dir=(0, 1, 0))) as fillet1_piece_4:
        with BuildLine():
            CenterArc((FILLET1_R, -FILLET1_R), FILLET1_R, 90, 90)
            Line((0, -FILLET1_R), (0, 0))
            Line((0, 0), (FILLET1_R, 0))
        make_face()
    extrude(amount=7, mode=Mode.SUBTRACT)

    # Fillet2
    fillet2_edges = [part.edges().sort_by_distance(p)[0] for p in [
        (-30, 2.5, -85),
        (190, 2.5, -85),
        (190, 2.5, 10),
        (-30, 2.5, 10),
    ]]
    fillet(fillet2_edges, radius=FILLET2_R)


solid = part.part
